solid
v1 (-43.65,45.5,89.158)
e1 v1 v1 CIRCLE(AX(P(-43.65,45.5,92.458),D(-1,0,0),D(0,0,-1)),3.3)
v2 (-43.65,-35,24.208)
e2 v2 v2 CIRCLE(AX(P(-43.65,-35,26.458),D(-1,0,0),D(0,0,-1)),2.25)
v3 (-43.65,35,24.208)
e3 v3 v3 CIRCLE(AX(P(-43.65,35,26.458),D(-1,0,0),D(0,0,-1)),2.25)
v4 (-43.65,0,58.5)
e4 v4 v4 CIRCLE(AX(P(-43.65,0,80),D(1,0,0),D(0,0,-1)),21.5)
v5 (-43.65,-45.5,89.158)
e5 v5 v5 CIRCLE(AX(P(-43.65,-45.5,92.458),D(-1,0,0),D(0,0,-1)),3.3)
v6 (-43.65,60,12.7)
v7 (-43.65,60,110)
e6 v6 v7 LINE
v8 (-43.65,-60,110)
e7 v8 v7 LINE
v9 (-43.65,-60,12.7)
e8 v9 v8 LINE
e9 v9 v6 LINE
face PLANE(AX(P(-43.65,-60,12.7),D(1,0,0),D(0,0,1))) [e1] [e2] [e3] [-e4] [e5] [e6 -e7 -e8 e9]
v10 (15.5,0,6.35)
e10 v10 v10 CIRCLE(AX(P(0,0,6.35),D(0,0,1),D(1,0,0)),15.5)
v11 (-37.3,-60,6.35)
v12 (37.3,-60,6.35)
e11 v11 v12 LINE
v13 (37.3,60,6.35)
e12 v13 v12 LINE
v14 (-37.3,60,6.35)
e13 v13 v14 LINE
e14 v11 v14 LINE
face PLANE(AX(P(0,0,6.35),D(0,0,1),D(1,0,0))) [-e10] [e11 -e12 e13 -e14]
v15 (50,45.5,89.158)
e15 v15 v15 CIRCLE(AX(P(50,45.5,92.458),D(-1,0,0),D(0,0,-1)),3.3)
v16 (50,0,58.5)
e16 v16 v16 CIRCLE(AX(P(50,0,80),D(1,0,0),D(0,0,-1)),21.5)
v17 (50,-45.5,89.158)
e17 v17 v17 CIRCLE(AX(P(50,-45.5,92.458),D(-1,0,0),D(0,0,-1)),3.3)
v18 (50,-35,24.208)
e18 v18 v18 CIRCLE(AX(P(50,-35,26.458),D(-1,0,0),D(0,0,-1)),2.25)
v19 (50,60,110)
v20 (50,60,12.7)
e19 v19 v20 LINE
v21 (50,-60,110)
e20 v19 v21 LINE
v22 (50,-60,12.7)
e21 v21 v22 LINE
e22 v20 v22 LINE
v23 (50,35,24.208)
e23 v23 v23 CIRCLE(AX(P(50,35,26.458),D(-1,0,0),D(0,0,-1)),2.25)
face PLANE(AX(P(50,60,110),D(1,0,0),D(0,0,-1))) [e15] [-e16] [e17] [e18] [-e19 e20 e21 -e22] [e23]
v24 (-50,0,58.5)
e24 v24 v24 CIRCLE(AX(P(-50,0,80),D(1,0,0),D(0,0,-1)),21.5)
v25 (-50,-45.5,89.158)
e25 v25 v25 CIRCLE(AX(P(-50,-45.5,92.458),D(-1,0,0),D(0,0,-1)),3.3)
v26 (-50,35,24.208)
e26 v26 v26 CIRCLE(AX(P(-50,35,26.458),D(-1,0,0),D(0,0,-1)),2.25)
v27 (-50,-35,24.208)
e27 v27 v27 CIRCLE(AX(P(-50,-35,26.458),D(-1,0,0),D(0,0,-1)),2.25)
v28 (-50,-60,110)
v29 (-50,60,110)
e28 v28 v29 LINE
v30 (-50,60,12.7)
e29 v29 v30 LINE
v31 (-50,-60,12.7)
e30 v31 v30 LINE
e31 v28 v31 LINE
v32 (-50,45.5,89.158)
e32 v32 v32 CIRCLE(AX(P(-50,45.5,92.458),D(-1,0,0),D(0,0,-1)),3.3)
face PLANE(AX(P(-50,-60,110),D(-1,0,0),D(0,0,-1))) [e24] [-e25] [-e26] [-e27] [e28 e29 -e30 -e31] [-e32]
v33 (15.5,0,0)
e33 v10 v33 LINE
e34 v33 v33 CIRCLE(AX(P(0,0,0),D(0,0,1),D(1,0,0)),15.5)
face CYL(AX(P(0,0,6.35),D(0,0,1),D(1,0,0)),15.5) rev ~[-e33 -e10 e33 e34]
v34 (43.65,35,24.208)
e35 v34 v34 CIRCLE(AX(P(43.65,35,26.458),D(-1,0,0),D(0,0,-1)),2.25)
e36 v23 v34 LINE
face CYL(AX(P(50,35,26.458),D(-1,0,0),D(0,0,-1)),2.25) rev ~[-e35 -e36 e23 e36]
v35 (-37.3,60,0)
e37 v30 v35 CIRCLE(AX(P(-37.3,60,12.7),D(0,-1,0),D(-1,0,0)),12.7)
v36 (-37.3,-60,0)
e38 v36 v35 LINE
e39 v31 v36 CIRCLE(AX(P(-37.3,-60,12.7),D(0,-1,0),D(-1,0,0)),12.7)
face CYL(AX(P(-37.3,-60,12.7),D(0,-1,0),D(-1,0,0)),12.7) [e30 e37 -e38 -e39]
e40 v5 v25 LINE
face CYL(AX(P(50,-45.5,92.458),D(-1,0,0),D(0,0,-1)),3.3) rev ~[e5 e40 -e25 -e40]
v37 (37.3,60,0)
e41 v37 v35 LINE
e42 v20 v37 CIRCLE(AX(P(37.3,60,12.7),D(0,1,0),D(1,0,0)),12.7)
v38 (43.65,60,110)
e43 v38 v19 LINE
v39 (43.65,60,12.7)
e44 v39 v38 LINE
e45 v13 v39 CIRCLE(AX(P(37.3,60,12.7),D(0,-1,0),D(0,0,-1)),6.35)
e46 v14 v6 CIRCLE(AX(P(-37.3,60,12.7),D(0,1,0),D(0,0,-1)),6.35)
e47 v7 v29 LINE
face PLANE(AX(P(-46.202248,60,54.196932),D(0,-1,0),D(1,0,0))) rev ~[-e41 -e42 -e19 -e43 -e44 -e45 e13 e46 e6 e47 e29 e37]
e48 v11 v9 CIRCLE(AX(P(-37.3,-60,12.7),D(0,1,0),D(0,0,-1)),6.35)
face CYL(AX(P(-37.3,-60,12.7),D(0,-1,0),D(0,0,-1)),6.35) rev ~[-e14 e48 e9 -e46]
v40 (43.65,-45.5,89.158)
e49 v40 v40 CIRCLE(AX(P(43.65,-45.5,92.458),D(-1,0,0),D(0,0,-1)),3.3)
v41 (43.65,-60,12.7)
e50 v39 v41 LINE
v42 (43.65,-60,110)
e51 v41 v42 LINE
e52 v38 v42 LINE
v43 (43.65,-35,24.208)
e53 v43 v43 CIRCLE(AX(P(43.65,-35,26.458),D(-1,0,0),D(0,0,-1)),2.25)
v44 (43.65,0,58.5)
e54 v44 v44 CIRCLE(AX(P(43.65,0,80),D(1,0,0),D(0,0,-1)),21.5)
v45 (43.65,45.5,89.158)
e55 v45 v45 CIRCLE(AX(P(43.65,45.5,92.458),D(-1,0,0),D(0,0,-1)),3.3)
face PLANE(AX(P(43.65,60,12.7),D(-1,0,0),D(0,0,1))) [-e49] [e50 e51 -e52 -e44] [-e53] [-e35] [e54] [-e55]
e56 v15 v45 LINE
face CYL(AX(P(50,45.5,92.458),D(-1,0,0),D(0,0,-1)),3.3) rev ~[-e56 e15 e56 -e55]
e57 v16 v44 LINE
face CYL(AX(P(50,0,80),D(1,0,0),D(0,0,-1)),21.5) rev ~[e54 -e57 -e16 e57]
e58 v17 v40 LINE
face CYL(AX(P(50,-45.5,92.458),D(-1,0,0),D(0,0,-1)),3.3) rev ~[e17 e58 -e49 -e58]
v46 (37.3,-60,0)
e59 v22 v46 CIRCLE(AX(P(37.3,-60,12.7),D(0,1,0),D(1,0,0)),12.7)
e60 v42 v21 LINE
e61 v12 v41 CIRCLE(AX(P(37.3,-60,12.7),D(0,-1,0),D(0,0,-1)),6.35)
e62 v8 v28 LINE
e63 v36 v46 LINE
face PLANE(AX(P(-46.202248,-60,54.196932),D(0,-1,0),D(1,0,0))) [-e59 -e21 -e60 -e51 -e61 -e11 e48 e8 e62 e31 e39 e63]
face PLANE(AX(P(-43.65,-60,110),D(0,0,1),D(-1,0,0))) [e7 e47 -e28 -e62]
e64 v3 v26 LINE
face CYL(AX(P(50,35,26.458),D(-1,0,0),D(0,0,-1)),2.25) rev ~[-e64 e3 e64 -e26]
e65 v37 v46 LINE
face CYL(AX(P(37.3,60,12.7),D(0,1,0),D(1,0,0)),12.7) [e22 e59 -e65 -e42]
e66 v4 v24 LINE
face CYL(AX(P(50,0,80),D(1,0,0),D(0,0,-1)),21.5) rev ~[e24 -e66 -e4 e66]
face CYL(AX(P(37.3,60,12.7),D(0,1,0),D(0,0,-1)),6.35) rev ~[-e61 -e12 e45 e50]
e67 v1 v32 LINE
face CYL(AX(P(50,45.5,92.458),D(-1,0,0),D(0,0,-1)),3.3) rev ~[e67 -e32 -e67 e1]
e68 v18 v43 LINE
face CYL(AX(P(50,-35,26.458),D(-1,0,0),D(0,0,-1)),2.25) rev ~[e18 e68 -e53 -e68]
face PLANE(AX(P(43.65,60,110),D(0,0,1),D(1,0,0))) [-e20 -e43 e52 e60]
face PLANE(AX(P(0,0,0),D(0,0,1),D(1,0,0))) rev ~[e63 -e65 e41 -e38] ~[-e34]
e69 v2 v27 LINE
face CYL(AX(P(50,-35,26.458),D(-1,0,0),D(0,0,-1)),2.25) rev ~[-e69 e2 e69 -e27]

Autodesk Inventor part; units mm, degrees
ref_plane "YZ Plane" through (0, 0, 0) normal (1, 0, 0) x (0, 1, 0)
ref_plane "XZ Plane" through (0, 0, 0) normal (0, 1, 0) x (-1, 0, 0)
ref_plane "XY Plane" through (0, 0, 0) normal (0, 0, 1) x (1, 0, 0)
sketch "Sketch1" plane through (0, 0, 0) normal (0, 0, 1) x (1, 0, 0)
  line L0 (-50, -60) -> (50, -60)
  line L1 (50, -60) -> (50, 60)
  line L2 (50, 60) -> (-50, 60)
  line L3 (-50, 60) -> (-50, -60)
  line L4 (-50, -60) -> (50, 60) construction
  line L5 (50, -60) -> (-50, 60) construction
  point P0 (0, 0)
  dimension "d0" = 100
  dimension "d1" = 120
extrude "Plate1" add sketch "Sketch1" along normal blind 6.35
sketch "Sketch2" plane through (-43.65, -60, 0) normal (-1, 0, 0) x (0, -1, 0)
  line L0 (-120, 0) -> (0, 0)
  line L1 (0, 0) -> (0, 110)
  line L2 (0, 110) -> (-120, 110)
  line L3 (-120, 110) -> (-120, 0)
edge flange "Flange1" height 110 angle 90 thickness 6.35 bend radius 6.35 thickness toward (-1, 0, 0) relief tear relief width 6.35 relief depth 3.175 corner gap 6.35 corner form 0 edges at (-50, 0, 6.35) (50, 0, 6.35) wall of the first edge with corners at (-43.65, 60, 0) (-43.65, -60, 0) (-43.65, -60, 110) (-43.65, 60, 110)
bend "Bend1"
corner "Corner1"
sketch "Sketch3" plane through (50, -60, 110) normal (1, 0, 0) x (0, 0, -1)
  circle A0 centre (30, 60) radius 21.082 construction
  circle A1 centre (30, 60) radius 21.5
  point P0 (110, 60)
  dimension "d13" = 42.164
  dimension "d14" = 43
  dimension "d15" = 80
extrude "Cut1" cut sketch "Sketch3" against normal through all
sketch "Sketch4" plane through (0, 0, 6.35) normal (0, 0, 1) x (1, 0, 0)
  circle A0 centre (0, 0) radius 15.5
  dimension "d18" = 31
extrude "Cut2" cut sketch "Sketch4" against normal blind 6.35
sketch "Sketch5" plane through (50, -60, 110) normal (1, 0, 0) x (0, 0, -1)
  circle A0 centre (30, 60) radius 21.5 projected
  line L0 (97.3, 0) -> (97.3, 120) projected
  line L1 (0, 120) -> (97.3, 120) projected
  line L2 (0, 0) -> (0, 120) projected
  line L3 (97.3, 0) -> (0, 0) projected
  line L4 (0, 120) -> (97.3, 120) construction
  line L5 (97.3, 0) -> (0, 0) construction
  line L6 (17.542, 105.5) -> (17.542, 14.5) construction
  line L7 (0, 0) -> (0, 120) construction
  point P0 (110, 60)
  point P1 (0, 60)
  point P2 (17.542, 60)
  dimension "d38" = 17.542
  dimension "d39" = 45.5
hole "Hole1" at (50, -45.5, 92.458) at (50, 45.5, 92.458) direction (-1, 0, 0) diameter 6.6 end through all clearance for "Flat Head Machine Screw" size "M6" standard "Ansi Metric M Profile"
sketch "Sketch6" plane through (50, -60, 110) normal (1, 0, 0) x (0, 0, -1)
  circle A0 centre (17.542, 14.5) radius 3.3 projected
  circle A1 centre (17.542, 105.5) radius 3.3 projected
  circle A2 centre (30, 60) radius 21.5 projected
  line L0 (97.3, 0) -> (97.3, 120) projected
  line L1 (0, 120) -> (97.3, 120) projected
  line L2 (0, 0) -> (0, 120) projected
  line L3 (97.3, 0) -> (0, 0) projected
  line L4 (83.542, 25) -> (83.542, 95) construction
  point P0 (110, 60)
  point P1 (83.542, 60)
  dimension "d29" = 70
  dimension "d30" = 83.542
hole "Hole2" at (50, -35, 26.458) at (50, 35, 26.458) direction (-1, 0, 0) diameter 4.5 end through all clearance for "Flat Head Machine Screw" size "M4" standard "Ansi Metric M Profile"
equation "\"d16\" = Thickness"
equation "\"d19\" = Thickness"
equation "\"d27\" = Thickness"
equation "\"d36\" = Thickness"
equation "\"d2\" = Thickness"
equation "\"d3\" = BendReliefWidth"
equation "\"d4\" = BendReliefDepth"
equation "\"d5\" = MinimumRemnant"
equation "\"d6\" = TransitionRadius"
equation "\"d9\" = BendRadius"
equation "\"d10\" = CornerReliefSize"
equation "\"d11\" = GapSize"
equation "\"d12\" = JacobiRadiusSize"
equation "\"BendRadius\" = Thickness"
equation "\"BendReliefWidth\" = Thickness"
equation "\"BendReliefDepth\" = 0.5 * Thickness"
equation "\"CornerReliefSize\" = 4 * Thickness"
equation "\"MinimumRemnant\" = 2 * Thickness"
equation "\"TransitionRadius\" = BendRadius"
equation "\"JacobiRadiusSize\" = BendRadius"
equation "\"GapSize\" = Thickness"
equation "\"Thickness\" = 6.35"
properties part number "Ground_Tracker_Bearing" material "UHMW, White"
